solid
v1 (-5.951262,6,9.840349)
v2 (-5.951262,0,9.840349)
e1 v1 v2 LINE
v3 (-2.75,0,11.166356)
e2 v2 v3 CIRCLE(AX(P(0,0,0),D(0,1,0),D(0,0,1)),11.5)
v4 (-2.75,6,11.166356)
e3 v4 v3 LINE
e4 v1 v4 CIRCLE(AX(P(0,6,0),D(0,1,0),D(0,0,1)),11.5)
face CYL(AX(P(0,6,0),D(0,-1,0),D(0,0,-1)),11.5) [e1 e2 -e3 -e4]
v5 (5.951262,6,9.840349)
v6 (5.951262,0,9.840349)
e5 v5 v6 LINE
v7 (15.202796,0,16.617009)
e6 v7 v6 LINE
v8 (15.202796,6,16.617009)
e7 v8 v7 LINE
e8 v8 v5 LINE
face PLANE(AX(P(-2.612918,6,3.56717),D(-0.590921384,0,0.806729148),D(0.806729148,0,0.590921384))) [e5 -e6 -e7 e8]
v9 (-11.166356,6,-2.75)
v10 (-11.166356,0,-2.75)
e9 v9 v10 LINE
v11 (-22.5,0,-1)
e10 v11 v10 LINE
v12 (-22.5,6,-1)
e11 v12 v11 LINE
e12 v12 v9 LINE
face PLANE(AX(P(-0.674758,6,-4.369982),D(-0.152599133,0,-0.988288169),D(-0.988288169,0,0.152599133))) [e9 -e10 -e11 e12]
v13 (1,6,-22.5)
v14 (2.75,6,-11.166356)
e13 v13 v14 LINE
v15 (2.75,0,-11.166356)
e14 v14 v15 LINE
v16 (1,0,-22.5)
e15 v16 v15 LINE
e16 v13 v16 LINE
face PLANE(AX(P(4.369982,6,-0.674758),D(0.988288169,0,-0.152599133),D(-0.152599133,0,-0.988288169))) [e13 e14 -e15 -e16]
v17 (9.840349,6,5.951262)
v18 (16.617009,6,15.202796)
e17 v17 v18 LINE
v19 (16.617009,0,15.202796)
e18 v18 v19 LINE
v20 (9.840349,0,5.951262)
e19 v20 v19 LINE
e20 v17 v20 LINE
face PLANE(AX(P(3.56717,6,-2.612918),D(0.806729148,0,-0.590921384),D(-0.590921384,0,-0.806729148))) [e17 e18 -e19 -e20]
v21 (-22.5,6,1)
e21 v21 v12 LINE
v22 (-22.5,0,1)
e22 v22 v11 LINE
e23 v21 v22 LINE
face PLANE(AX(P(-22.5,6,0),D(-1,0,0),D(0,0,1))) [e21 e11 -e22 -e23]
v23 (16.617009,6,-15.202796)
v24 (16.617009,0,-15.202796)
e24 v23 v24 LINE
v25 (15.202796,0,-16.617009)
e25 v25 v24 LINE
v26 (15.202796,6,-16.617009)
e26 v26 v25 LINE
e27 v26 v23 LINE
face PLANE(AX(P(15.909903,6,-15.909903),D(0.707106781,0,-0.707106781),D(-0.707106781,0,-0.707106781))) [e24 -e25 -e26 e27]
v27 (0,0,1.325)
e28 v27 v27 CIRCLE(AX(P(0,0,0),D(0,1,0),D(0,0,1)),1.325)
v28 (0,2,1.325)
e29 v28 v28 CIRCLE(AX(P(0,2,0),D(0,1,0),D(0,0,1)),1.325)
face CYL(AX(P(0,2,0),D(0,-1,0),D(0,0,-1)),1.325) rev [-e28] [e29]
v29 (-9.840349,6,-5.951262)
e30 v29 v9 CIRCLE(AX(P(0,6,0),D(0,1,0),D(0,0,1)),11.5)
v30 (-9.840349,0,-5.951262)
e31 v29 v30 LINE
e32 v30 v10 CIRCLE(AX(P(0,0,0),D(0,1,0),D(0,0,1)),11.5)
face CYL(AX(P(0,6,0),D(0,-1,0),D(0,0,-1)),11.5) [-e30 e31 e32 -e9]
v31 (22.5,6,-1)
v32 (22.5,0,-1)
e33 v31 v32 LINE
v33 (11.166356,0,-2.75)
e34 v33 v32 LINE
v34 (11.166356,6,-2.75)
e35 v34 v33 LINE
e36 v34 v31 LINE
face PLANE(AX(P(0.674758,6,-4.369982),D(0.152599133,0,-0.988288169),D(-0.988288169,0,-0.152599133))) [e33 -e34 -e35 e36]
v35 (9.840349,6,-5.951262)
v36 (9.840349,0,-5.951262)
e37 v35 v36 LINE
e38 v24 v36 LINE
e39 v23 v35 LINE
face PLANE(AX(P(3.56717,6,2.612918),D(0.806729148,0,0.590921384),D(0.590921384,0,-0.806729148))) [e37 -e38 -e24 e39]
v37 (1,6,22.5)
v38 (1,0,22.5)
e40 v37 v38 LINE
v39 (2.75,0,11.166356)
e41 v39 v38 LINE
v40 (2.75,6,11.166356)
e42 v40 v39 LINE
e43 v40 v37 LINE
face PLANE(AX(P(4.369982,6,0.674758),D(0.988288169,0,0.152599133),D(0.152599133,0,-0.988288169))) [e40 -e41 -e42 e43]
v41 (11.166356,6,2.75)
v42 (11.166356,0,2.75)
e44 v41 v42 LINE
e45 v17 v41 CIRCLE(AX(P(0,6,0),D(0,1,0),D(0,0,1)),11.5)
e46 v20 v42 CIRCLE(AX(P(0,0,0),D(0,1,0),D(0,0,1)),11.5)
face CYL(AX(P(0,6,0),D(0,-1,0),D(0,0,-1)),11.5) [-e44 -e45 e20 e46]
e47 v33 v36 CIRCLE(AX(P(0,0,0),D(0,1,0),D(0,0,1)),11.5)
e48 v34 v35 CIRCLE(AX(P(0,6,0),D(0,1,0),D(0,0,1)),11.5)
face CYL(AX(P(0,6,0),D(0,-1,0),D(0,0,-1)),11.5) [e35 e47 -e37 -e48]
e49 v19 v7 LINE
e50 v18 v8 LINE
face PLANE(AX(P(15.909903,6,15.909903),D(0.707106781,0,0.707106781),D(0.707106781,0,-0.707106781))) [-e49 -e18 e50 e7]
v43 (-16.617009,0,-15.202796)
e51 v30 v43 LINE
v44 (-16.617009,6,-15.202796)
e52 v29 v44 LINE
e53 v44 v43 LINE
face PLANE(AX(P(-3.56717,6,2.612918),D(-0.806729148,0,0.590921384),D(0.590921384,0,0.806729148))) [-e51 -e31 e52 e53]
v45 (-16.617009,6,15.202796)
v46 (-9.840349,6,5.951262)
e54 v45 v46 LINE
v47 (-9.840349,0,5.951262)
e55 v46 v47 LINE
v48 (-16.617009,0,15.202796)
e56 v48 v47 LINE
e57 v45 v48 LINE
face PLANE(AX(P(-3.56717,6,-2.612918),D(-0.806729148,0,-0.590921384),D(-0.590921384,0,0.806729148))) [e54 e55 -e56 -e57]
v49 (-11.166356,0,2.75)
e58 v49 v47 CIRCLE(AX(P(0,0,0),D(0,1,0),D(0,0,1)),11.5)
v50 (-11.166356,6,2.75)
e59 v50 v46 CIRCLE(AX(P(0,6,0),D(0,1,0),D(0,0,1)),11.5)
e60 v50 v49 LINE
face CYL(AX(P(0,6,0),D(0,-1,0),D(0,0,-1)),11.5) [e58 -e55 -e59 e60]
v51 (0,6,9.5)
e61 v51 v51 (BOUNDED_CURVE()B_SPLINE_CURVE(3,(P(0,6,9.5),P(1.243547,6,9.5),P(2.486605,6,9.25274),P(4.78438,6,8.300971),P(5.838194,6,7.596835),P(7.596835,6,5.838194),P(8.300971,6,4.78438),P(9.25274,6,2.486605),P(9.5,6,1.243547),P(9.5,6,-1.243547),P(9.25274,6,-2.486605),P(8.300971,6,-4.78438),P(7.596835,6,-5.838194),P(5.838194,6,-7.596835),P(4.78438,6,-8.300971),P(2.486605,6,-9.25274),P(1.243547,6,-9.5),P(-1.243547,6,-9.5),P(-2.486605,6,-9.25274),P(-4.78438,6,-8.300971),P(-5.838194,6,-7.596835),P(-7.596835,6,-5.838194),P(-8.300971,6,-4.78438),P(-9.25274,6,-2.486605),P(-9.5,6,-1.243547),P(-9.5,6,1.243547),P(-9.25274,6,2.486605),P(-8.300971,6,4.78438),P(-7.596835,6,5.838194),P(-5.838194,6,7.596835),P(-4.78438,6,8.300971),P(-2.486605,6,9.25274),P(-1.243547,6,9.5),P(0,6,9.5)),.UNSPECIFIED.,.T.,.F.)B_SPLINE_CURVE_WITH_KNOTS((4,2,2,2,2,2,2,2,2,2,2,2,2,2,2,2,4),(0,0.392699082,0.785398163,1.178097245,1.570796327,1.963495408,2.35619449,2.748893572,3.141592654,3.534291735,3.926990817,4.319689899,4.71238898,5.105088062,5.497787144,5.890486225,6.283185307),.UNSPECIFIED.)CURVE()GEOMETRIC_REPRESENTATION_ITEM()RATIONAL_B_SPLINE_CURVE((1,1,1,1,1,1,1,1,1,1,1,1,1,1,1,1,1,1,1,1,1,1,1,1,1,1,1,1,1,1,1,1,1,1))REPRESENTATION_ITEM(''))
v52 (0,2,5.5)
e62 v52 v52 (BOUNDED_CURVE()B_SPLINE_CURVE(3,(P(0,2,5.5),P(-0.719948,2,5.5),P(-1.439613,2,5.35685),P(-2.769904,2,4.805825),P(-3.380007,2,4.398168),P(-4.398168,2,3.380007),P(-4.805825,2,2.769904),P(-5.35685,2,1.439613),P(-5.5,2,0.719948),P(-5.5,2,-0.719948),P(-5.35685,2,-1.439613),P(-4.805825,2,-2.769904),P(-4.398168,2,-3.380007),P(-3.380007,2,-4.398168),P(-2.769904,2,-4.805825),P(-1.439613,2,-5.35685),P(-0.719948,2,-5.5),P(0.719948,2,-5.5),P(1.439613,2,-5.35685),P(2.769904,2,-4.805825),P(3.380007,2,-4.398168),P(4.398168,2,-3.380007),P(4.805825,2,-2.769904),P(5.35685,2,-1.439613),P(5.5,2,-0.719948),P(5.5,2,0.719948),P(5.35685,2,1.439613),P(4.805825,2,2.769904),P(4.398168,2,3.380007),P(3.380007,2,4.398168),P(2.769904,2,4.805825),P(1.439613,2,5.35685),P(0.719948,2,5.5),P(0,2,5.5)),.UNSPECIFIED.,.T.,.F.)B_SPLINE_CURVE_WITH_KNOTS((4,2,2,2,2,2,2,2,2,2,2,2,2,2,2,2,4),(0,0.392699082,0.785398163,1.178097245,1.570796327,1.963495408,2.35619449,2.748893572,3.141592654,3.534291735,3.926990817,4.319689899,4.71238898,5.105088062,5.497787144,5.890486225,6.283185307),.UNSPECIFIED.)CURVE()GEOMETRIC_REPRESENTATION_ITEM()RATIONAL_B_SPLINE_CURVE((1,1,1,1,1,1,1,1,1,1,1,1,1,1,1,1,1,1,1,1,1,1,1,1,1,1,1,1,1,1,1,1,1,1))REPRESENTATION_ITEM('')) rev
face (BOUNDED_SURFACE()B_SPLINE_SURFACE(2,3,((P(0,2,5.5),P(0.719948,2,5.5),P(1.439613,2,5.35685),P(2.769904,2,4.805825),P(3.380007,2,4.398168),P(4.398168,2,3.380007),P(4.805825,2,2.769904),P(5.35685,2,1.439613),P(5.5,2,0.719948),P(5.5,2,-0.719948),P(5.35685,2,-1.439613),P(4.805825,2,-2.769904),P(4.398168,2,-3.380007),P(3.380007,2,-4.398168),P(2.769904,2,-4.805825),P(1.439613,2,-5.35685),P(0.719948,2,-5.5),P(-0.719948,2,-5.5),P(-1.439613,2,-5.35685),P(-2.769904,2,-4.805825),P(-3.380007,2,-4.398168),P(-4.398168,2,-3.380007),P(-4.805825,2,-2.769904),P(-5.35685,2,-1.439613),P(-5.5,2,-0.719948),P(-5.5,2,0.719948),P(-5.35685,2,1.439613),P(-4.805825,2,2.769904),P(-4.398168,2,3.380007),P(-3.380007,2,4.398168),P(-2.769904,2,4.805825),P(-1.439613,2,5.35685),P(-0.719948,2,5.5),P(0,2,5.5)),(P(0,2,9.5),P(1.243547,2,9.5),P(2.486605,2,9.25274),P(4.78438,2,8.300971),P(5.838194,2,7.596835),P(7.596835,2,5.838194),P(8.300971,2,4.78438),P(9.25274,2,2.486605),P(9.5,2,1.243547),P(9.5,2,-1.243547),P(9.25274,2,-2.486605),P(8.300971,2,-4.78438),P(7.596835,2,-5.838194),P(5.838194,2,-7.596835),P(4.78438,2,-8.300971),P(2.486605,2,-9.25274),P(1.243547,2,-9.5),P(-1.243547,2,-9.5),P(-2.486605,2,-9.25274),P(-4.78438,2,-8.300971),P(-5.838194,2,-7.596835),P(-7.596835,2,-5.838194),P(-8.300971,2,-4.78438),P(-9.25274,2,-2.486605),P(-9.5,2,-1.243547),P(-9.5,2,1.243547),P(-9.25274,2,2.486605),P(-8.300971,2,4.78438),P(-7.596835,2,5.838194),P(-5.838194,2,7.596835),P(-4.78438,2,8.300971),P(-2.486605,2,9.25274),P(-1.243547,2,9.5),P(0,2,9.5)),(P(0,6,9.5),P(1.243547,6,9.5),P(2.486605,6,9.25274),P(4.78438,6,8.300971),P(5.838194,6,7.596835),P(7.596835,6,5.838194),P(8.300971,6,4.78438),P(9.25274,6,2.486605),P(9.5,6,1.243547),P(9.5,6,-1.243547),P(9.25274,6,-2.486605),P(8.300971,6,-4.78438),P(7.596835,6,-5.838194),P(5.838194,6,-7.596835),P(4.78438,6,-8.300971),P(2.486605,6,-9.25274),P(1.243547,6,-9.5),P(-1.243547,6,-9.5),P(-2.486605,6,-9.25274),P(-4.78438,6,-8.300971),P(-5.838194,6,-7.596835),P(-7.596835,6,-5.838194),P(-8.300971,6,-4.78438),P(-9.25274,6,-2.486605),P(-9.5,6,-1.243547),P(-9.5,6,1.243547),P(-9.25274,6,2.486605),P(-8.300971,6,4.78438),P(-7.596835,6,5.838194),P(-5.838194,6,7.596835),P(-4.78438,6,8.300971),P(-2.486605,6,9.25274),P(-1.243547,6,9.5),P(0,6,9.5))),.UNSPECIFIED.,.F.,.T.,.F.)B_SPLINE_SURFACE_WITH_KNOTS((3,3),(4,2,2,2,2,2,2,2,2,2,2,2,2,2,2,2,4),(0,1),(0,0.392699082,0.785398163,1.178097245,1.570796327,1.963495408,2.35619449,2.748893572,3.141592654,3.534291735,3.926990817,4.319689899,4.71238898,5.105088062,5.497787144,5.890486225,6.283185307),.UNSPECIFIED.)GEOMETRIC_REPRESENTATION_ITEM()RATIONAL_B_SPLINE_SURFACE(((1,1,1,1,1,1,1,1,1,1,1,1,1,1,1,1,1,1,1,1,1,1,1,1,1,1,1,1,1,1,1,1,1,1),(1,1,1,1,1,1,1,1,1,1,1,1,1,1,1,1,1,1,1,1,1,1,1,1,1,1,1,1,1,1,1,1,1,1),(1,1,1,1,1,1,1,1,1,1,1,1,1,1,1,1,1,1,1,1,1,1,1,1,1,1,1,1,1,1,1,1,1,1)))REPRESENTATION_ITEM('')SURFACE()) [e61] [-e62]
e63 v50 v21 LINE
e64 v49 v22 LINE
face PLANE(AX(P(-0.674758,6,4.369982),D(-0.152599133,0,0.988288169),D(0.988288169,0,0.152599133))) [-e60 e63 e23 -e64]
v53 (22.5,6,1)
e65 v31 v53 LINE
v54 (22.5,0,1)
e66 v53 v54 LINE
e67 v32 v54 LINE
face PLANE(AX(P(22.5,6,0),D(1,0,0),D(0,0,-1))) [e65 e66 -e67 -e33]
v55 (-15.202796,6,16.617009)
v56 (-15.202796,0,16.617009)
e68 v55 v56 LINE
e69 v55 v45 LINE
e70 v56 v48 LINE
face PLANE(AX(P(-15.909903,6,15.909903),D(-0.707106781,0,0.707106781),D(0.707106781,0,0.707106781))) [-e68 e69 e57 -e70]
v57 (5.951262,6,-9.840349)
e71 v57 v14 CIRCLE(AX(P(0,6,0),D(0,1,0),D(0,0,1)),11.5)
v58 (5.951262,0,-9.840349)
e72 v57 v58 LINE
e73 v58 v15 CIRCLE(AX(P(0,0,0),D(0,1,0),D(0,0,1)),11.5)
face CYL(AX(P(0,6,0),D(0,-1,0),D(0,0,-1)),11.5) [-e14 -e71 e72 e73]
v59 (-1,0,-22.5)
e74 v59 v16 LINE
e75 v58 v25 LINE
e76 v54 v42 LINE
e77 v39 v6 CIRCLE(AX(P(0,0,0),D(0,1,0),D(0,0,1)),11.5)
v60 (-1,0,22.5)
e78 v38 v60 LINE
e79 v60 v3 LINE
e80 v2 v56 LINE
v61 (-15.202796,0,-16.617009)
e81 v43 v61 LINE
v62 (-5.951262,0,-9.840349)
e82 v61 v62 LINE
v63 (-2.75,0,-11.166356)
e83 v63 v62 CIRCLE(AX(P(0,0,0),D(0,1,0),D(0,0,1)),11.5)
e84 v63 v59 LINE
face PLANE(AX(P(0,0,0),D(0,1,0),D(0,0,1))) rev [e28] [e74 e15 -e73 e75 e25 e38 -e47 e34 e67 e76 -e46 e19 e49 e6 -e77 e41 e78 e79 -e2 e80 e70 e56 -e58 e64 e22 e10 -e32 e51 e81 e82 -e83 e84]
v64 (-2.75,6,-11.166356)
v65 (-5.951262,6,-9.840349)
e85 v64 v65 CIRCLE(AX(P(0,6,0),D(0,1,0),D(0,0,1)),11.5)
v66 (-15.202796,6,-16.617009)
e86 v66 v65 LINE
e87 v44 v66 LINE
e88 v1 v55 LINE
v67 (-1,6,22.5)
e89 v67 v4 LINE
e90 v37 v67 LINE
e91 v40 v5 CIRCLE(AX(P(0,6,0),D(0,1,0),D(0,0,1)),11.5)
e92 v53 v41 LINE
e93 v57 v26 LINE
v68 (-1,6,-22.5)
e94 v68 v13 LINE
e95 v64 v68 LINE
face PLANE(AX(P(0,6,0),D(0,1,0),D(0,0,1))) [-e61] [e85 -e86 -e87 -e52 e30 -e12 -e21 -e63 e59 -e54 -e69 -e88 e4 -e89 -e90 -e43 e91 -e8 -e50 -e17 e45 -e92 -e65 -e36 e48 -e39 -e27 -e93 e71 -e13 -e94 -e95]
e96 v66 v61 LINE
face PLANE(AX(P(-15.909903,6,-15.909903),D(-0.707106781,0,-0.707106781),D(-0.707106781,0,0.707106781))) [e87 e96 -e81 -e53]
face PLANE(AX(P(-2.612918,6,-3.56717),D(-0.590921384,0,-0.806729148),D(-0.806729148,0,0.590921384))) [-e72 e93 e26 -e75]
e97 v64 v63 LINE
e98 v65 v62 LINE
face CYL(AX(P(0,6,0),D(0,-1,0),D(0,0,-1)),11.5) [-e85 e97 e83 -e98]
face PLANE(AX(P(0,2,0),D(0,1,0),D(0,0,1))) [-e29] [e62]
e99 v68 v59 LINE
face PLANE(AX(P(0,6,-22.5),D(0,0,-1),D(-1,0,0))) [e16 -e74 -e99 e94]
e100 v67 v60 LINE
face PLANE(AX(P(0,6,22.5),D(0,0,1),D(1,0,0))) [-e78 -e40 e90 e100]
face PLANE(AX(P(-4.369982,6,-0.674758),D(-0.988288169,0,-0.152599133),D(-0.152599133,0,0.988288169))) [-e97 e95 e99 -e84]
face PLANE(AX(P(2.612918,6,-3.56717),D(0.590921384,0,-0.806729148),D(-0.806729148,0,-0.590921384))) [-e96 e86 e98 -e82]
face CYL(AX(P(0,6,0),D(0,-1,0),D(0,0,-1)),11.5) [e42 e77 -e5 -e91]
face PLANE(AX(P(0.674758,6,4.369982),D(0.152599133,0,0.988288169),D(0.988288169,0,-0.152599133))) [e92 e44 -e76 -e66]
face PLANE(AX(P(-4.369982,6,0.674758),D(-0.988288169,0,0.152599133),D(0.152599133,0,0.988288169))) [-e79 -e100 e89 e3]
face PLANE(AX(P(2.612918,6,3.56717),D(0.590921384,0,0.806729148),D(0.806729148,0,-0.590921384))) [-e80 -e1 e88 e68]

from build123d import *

# Parameters (mm, degrees)
SKETCH1_R           = 11.5
SKETCH1_R_2         = 9.5
BOSS_EXTRUDE2_DEPTH = 6
SKETCH1_6_R         = 11.5
SKETCH1_6_R_2       = 1.325
BOSS_EXTRUDE3_DEPTH = 2
FILLET4_SIZE        = 4


with BuildPart() as part:
    # Sketch1 → Boss-Extrude2 (new body)
    # profile 1 of 9: a face of its own
    with BuildSketch(Plane(origin=(0, 0, 0), x_dir=(1, 0, 0), z_dir=(0, 1, 0))):
        with BuildLine():
            ThreePointArc((-11.166355717, -2.75), (-11.5, 0), (-11.166355717, 2.75))
            Line((-11.166355717, 2.75), (-22.5, 1))
            Line((-22.5, 1), (-22.5, -1))
            Line((-22.5, -1), (-11.166355717, -2.75))
        make_face()
    # profile 2 of 9: a face of its own
    with BuildSketch(Plane(origin=(0, 0, 0), x_dir=(1, 0, 0), z_dir=(0, 1, 0))):
        with BuildLine():
            Line((-15.202795796, -16.617009358), (-5.9512622, -9.840349497))
            ThreePointArc((-5.9512622, -9.840349497), (-8.131727984, -8.131727984), (-9.840349497, -5.9512622))
            Line((-9.840349497, -5.9512622), (-16.617009358, -15.202795796))
            Line((-16.617009358, -15.202795796), (-15.202795796, -16.617009358))
        make_face()
    # profile 3 of 9: a face of its own
    with BuildSketch(Plane(origin=(0, 0, 0), x_dir=(1, 0, 0), z_dir=(0, 1, 0))):
        with BuildLine():
            ThreePointArc((-9.840349497, 5.9512622), (-8.131727984, 8.131727984), (-5.9512622, 9.840349497))
            Line((-5.9512622, 9.840349497), (-15.202795796, 16.617009358))
            Line((-15.202795796, 16.617009358), (-16.617009358, 15.202795796))
            Line((-16.617009358, 15.202795796), (-9.840349497, 5.9512622))
        make_face()
    # profile 4 of 9: a face of its own
    with BuildSketch(Plane(origin=(0, 0, 0), x_dir=(1, 0, 0), z_dir=(0, 1, 0))):
        with BuildLine():
            ThreePointArc((-2.75, 11.166355717), (0, 11.5), (2.75, 11.166355717))
            Line((2.75, 11.166355717), (1, 22.5))
            Line((1, 22.5), (-1, 22.5))
            Line((-1, 22.5), (-2.75, 11.166355717))
        make_face()
    # profile 5 of 9: a face of its own
    with BuildSketch(Plane(origin=(0, 0, 0), x_dir=(1, 0, 0), z_dir=(0, 1, 0))):
        with BuildLine():
            ThreePointArc((5.9512622, 9.840349497), (8.131727984, 8.131727984), (9.840349497, 5.9512622))
            Line((9.840349497, 5.9512622), (16.617009358, 15.202795796))
            Line((16.617009358, 15.202795796), (15.202795796, 16.617009358))
            Line((15.202795796, 16.617009358), (5.9512622, 9.840349497))
        make_face()
    # profile 6 of 9: a face of its own
    with BuildSketch(Plane(origin=(0, 0, 0), x_dir=(1, 0, 0), z_dir=(0, 1, 0))):
        with BuildLine():
            Line((22.5, 1), (11.166355717, 2.75))
            ThreePointArc((11.166355717, 2.75), (11.416284219, 1.385082895), (11.5, 0))
            ThreePointArc((11.5, 0), (11.416284219, -1.385082895), (11.166355717, -2.75))
            Line((11.166355717, -2.75), (22.5, -1))
            Line((22.5, -1), (22.5, 1))
        make_face()
    # profile 7 of 9: a face of its own
    with BuildSketch(Plane(origin=(0, 0, 0), x_dir=(1, 0, 0), z_dir=(0, 1, 0))):
        with BuildLine():
            Line((1, -22.5), (2.75, -11.166355717))
            ThreePointArc((2.75, -11.166355717), (0, -11.5), (-2.75, -11.166355717))
            Line((-2.75, -11.166355717), (-1, -22.5))
            Line((-1, -22.5), (1, -22.5))
        make_face()
    # profile 8 of 9: a face of its own
    with BuildSketch(Plane(origin=(0, 0, 0), x_dir=(1, 0, 0), z_dir=(0, 1, 0))):
        with BuildLine():
            Line((16.617009358, -15.202795796), (9.840349497, -5.9512622))
            ThreePointArc((9.840349497, -5.9512622), (8.131727984, -8.131727984), (5.9512622, -9.840349497))
            Line((5.9512622, -9.840349497), (15.202795796, -16.617009358))
            Line((15.202795796, -16.617009358), (16.617009358, -15.202795796))
        make_face()
    # profile 9 of 9: a face of its own
    with BuildSketch(Plane(origin=(0, 0, 0), x_dir=(1, 0, 0), z_dir=(0, 1, 0))):
        Circle(SKETCH1_R)
        with Locations(Location((0, 0, 0), (0, 0, 270))):
            Circle(SKETCH1_R_2, mode=Mode.SUBTRACT)
    extrude(amount=BOSS_EXTRUDE2_DEPTH)

    # Sketch1<6> → Boss-Extrude3 (add)
    with BuildSketch(Plane(origin=(0, 0, 0), x_dir=(1, 0, 0), z_dir=(0, 1, 0))):
        Circle(SKETCH1_6_R)
        with Locations(Location((0, 0, 0), (0, 0, 270))):
            Circle(SKETCH1_6_R_2, mode=Mode.SUBTRACT)
    extrude(amount=BOSS_EXTRUDE3_DEPTH)

    # Fillet4
    # a fillet whose section is not a circle: 4 mm, written as the material it adds along each edge
    with BuildSketch(Plane(origin=(0, 2, 0), x_dir=(0, 0, 1), z_dir=(1, 0, 0))) as fillet4_piece_1:
        with BuildLine():
            Bezier((9.5 - FILLET4_SIZE, 0), (9.5, 0), (9.5, -FILLET4_SIZE), weights=[1, 1, 1])
            Line((9.5, -FILLET4_SIZE), (9.5, 0))
            Line((9.5, 0), (9.5 - FILLET4_SIZE, 0))
        make_face()
    revolve(axis=Axis((0, 2, 0), (0, -1, 0)))


solid = part.part
